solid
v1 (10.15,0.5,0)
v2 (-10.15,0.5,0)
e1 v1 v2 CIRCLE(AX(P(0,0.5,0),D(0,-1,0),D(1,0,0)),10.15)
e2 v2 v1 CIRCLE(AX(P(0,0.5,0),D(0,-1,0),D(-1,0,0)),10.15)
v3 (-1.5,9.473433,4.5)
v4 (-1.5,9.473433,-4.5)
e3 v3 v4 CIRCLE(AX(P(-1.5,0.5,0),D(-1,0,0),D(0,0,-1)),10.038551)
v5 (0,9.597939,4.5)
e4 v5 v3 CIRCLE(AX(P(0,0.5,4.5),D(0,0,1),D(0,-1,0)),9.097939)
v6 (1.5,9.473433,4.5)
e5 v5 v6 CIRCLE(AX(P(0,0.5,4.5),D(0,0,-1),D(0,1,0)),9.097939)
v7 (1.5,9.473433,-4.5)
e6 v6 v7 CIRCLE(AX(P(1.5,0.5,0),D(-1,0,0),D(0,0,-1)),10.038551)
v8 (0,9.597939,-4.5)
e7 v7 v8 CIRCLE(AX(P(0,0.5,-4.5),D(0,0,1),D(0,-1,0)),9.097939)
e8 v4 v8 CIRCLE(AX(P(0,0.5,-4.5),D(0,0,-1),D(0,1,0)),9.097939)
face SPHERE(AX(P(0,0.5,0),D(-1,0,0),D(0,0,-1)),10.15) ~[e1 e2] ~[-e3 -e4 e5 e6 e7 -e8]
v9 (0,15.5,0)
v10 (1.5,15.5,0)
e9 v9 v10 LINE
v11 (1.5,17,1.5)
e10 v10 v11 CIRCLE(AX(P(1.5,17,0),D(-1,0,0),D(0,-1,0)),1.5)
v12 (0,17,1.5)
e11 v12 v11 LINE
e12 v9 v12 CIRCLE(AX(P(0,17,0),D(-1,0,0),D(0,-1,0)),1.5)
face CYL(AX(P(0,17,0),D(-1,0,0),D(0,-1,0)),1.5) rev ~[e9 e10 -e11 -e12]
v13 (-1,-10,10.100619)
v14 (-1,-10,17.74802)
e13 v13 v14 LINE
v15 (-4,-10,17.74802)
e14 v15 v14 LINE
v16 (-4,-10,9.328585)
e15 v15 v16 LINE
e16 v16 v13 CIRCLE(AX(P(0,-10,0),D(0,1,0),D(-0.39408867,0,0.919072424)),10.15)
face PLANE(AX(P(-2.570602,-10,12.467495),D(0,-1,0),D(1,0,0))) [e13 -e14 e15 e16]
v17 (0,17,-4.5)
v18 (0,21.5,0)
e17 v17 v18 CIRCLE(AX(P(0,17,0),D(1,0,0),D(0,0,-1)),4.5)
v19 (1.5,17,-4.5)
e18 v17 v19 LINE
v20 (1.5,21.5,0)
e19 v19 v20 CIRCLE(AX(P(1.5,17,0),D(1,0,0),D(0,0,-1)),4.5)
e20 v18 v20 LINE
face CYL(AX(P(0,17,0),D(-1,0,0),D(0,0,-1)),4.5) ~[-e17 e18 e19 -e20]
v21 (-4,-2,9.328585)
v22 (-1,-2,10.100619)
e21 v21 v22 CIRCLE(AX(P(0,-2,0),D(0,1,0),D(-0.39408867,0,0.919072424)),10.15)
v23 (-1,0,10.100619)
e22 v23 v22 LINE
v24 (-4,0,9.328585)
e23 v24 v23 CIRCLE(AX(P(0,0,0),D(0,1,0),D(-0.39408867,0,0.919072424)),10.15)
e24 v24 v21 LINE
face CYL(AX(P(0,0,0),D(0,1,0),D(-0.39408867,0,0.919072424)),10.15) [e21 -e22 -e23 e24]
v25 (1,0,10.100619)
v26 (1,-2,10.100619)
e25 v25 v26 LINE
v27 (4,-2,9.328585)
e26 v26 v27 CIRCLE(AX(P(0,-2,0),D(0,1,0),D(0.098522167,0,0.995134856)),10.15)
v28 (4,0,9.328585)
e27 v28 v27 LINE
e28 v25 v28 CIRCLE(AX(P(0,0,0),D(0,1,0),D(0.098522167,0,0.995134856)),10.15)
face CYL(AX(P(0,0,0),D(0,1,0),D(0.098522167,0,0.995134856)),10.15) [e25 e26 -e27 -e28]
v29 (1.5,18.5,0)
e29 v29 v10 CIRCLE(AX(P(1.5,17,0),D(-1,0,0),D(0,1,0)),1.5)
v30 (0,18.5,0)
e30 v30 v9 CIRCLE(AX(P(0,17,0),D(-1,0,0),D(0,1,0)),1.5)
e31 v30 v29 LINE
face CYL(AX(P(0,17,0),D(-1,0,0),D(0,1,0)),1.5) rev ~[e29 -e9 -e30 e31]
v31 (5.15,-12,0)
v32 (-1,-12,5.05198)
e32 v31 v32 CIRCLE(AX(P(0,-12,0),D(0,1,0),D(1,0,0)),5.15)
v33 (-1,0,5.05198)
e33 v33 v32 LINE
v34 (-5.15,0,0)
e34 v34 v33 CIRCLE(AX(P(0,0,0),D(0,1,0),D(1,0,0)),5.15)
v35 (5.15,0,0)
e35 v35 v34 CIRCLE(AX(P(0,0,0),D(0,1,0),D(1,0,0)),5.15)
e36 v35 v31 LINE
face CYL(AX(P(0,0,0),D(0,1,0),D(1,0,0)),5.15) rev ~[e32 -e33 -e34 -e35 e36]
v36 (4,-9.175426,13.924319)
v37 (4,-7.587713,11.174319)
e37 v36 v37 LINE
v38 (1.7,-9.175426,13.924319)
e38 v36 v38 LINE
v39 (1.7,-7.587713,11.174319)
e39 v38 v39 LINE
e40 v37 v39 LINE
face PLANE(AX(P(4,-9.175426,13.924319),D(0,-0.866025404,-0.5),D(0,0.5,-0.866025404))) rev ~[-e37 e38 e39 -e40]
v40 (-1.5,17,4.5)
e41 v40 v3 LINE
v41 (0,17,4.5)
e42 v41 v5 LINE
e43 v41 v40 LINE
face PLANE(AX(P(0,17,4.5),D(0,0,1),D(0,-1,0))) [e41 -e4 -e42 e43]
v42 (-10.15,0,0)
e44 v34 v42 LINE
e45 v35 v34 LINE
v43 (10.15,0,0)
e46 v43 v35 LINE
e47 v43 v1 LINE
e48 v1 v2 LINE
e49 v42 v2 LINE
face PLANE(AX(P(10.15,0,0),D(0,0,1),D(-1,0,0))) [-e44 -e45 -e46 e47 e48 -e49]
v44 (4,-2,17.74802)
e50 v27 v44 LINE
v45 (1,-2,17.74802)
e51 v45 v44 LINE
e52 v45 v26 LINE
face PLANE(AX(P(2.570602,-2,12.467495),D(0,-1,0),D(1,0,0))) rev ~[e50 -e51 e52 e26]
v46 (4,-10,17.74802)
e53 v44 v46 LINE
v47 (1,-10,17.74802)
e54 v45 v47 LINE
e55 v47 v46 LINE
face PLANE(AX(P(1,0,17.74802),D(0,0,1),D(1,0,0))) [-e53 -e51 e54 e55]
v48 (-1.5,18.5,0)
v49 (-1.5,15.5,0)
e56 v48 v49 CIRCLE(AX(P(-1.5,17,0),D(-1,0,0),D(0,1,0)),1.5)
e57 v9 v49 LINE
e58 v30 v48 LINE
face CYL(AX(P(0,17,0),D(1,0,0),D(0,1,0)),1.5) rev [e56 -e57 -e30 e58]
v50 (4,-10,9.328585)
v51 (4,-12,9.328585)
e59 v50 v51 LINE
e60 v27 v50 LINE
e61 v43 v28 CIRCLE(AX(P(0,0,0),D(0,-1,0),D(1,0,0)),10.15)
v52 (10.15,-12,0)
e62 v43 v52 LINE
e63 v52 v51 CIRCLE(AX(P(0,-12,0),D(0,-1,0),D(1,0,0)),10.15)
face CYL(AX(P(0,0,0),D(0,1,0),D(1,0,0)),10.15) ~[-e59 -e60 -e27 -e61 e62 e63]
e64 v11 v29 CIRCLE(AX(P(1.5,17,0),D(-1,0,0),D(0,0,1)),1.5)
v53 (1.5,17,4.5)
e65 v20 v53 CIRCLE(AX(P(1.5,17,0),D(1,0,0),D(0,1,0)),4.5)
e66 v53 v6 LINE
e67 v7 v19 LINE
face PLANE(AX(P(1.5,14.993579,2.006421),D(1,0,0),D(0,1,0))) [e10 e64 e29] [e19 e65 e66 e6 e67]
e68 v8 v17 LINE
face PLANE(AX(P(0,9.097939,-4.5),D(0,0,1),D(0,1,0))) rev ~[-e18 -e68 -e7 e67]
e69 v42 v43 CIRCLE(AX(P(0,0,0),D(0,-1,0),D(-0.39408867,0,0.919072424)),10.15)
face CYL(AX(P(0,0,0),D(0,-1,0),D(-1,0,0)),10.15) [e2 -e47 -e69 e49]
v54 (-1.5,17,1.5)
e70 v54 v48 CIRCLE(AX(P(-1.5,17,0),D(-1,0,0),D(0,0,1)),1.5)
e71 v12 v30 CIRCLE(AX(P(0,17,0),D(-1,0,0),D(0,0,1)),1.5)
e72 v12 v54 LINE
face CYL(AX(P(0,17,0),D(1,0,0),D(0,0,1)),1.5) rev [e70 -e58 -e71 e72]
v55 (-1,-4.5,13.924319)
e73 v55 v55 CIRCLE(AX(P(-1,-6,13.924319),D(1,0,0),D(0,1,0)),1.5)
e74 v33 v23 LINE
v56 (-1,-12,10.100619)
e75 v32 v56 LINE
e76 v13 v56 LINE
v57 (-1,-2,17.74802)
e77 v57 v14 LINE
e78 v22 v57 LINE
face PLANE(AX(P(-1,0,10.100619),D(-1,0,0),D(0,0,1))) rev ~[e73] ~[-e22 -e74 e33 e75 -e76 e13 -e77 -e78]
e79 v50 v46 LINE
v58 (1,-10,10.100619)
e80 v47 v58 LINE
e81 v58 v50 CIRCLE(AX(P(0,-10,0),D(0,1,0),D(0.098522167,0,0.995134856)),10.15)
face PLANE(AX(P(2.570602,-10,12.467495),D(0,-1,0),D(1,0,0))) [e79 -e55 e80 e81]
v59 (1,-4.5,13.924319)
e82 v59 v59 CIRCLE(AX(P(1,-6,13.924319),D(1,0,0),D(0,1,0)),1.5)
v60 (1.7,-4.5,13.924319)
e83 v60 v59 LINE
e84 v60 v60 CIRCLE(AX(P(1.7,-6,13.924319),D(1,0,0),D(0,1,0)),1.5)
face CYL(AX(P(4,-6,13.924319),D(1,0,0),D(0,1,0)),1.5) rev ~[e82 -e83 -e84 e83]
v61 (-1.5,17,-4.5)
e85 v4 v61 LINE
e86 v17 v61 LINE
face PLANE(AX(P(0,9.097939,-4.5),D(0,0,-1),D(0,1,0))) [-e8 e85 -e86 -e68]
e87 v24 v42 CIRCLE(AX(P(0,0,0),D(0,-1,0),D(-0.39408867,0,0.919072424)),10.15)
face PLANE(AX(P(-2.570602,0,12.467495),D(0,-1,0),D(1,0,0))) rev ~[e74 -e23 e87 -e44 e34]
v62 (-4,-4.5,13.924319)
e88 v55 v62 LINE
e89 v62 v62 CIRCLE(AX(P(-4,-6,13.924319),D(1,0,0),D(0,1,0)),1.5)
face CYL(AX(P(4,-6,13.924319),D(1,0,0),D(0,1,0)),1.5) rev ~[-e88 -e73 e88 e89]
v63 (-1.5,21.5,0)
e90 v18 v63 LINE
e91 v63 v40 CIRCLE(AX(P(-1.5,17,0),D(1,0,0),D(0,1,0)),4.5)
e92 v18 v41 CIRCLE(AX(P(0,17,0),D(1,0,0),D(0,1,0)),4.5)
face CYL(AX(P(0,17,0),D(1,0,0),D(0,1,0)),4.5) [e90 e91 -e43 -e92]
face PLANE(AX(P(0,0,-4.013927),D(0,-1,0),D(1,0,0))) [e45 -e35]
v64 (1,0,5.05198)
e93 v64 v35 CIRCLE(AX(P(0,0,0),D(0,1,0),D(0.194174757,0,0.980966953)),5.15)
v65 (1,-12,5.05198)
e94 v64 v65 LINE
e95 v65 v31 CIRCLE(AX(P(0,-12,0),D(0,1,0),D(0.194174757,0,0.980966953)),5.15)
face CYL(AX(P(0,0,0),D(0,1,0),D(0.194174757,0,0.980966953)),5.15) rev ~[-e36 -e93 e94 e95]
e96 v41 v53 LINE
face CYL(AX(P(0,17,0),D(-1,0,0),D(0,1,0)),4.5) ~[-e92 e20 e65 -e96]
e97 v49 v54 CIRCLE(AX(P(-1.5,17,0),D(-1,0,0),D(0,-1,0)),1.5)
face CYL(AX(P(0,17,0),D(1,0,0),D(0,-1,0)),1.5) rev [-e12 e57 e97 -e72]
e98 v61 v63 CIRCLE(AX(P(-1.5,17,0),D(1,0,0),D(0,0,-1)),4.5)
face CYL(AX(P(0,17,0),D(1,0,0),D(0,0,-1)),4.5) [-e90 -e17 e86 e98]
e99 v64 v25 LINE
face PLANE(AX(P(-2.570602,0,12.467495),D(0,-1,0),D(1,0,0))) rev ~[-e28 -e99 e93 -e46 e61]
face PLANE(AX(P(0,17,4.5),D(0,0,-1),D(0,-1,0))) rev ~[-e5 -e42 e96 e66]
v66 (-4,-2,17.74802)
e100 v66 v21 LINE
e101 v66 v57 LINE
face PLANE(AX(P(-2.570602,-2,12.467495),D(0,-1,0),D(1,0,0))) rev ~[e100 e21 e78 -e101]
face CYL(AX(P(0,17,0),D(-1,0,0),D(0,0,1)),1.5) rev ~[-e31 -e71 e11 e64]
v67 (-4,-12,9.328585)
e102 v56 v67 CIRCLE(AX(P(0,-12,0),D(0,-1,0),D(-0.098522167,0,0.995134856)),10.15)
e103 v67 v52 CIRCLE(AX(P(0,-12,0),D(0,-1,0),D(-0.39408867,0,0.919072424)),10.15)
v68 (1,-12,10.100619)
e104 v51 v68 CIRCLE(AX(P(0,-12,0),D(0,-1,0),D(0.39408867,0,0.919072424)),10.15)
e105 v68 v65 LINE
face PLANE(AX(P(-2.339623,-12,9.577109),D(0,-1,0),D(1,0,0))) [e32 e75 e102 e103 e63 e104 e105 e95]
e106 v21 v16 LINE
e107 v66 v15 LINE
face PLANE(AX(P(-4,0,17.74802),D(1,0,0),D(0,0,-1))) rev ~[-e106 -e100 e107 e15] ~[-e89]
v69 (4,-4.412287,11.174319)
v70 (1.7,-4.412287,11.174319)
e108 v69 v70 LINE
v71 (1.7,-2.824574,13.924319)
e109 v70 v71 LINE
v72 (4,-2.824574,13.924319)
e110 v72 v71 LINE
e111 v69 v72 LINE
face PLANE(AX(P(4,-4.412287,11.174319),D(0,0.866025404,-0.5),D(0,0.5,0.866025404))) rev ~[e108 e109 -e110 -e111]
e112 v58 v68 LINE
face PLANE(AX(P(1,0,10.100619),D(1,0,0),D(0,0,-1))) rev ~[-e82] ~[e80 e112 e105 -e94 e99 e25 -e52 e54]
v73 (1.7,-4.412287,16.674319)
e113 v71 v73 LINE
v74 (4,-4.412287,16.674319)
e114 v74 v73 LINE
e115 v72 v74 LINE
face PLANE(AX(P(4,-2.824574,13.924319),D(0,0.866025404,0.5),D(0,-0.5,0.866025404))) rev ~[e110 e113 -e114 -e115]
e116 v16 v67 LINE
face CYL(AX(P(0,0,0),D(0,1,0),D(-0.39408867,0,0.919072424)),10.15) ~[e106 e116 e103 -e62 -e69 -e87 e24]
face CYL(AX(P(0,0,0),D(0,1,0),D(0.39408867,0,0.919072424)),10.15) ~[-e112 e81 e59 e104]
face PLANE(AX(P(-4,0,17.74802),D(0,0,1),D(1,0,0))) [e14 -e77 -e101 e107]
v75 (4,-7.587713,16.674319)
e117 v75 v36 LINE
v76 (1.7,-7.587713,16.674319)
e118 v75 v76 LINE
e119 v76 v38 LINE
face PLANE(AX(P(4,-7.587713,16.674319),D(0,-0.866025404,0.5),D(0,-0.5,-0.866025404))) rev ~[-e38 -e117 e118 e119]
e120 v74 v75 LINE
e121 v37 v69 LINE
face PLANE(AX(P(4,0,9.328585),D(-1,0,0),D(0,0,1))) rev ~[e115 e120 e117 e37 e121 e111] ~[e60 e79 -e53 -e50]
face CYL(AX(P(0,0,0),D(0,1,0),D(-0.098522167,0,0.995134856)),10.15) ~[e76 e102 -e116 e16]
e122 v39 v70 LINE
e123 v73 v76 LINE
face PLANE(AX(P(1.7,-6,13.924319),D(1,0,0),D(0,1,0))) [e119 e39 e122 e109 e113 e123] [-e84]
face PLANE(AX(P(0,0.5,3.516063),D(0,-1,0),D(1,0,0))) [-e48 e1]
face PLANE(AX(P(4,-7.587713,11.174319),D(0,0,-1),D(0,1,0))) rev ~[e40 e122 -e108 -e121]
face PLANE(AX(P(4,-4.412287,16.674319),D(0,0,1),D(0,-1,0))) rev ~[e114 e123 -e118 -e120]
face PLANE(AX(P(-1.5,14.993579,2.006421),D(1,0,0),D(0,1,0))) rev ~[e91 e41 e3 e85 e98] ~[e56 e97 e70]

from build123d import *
from build123d import SkipClean  # not in build123d's __all__

# Parameters (mm, degrees)
F1_DEPTH  = 12
F0_W      = 3
F0_H      = 2.5
F2_DEPTH  = 10
F3_DEPTH  = 2
F5_R      = 1.5
F6_DEPTH  = 25
F7_DEPTH  = 2.3
F9_DEPTH  = 0.5
F11_ANGLE = 180
F12_DEPTH = 1.5


with BuildPart() as f1:
    # F0 (on Front) → F1 (new body)
    with BuildSketch(Plane.XZ):
        with BuildLine():
            Line((-4, 9.3285851017), (-1, 9.3285851017))
            Line((-1, 9.3285851017), (-1, 10.1006187929))
            ThreePointArc((-1, 10.1006187929), (-2.529626258, 9.8297248687), (-4, 9.3285851017))
        make_face()
        with BuildLine():
            Line((1, 10.1006187929), (1, 9.3285851017))
            Line((1, 9.3285851017), (4, 9.3285851017))
            ThreePointArc((4, 9.3285851017), (2.529626258, 9.8297248687), (1, 10.1006187929))
        make_face()
        with BuildLine():
            ThreePointArc((1, 5.0519798099), (3.9794786091, 3.2689830223), (5.15, 0))
            ThreePointArc((5.15, 0), (-3.2689830223, -3.9794786091), (-1, 5.0519798099))
            Line((-1, 5.0519798099), (-1, 9.3285851017))
            Line((-1, 9.3285851017), (-4, 9.3285851017))
            ThreePointArc((-4, 9.3285851017), (-5.5867029633, -8.474151875), (10.15, 0))
            ThreePointArc((10.15, 0), (8.474151875, 5.5867029633), (4, 9.3285851017))
            Line((4, 9.3285851017), (1, 9.3285851017))
            Line((1, 9.3285851017), (1, 5.0519798099))
        make_face()
    extrude(amount=F1_DEPTH)

    # F0 (on Front) → F2 (join)
    with BuildSketch(Plane.XZ):
        with BuildLine():
            ThreePointArc((-4, 9.3285851017), (-2.529626258, 9.8297248687), (-1, 10.1006187929))
            Line((-1, 10.1006187929), (-1, 15.2480201901))
            Line((-1, 15.2480201901), (-4, 15.2480201901))
            Line((-4, 15.2480201901), (-4, 9.3285851017))
        make_face()
        with BuildLine():
            Line((1, 15.2480201901), (1, 10.1006187929))
            ThreePointArc((1, 10.1006187929), (2.529626258, 9.8297248687), (4, 9.3285851017))
            Line((4, 9.3285851017), (4, 15.2480201901))
            Line((4, 15.2480201901), (1, 15.2480201901))
        make_face()
        with Locations((-2.5, 16.4980201901)):
            Rectangle(F0_W, F0_H)
        with Locations((2.5, 16.4980201901)):
            Rectangle(F0_W, F0_H)
    extrude(amount=F2_DEPTH)

    # F0 (on Front) → F3 (cut)
    with BuildSketch(Plane.XZ):
        with BuildLine():
            ThreePointArc((-4, 9.3285851017), (-2.529626258, 9.8297248687), (-1, 10.1006187929))
            Line((-1, 10.1006187929), (-1, 15.2480201901))
            Line((-1, 15.2480201901), (-4, 15.2480201901))
            Line((-4, 15.2480201901), (-4, 9.3285851017))
        make_face()
        with BuildLine():
            Line((1, 15.2480201901), (1, 10.1006187929))
            ThreePointArc((1, 10.1006187929), (2.529626258, 9.8297248687), (4, 9.3285851017))
            Line((4, 9.3285851017), (4, 15.2480201901))
            Line((4, 15.2480201901), (1, 15.2480201901))
        make_face()
        with Locations((-2.5, 16.4980201901)):
            Rectangle(F0_W, F0_H)
        with Locations((2.5, 16.4980201901)):
            Rectangle(F0_W, F0_H)
    with SkipClean():  # cleaning this boolean's faces spoils the solid; the shape is the same uncleaned
        extrude(amount=F3_DEPTH, mode=Mode.SUBTRACT)

    # F5 (on face) → F6 (cut)
    with BuildSketch(Plane.YZ.offset(4)):
        with Locations((-6, 13.9243194915)):
            Circle(F5_R)
    extrude(amount=-F6_DEPTH, mode=Mode.SUBTRACT)

    # F5 (on face) → F7 (cut)
    with BuildSketch(Plane.YZ.offset(4)):
        Polygon((-4.4122867597, 16.6743194915), (-7.5877132403, 16.6743194915), (-9.1754264805, 13.9243194915), (-7.5877132403, 11.1743194915), (-4.4122867597, 11.1743194915), (-2.8245735195, 13.9243194915), align=None)
        with Locations((-6, 13.9243194915)):
            Circle(F5_R, mode=Mode.SUBTRACT)
    extrude(amount=-F7_DEPTH, mode=Mode.SUBTRACT)

    # F8 (on face) → F9 (join)
    with BuildSketch(Plane.XZ):
        with BuildLine():
            Line((10.15, 0), (5.15, 0))
            ThreePointArc((5.15, 0), (0, -5.15), (-5.15, 0))
            Line((-5.15, 0), (-10.15, 0))
            ThreePointArc((-10.15, 0), (0, -10.15), (10.15, 0))
        make_face()
        with BuildLine():
            ThreePointArc((-5.15, 0), (0, -5.15), (5.15, 0))
            Line((5.15, 0), (-5.15, 0))
        make_face()
    extrude(amount=-F9_DEPTH)

    # F9_face (on face) → F11 (revolve)
    with BuildSketch(Plane(origin=(0, 0.5, -4.307793793), x_dir=(1, 0, 0), z_dir=(0, 1, 0))):
        with BuildLine():
            Line((-10.15, -4.307793793), (10.15, -4.307793793))
            ThreePointArc((10.15, -4.307793793), (0, 5.842206207), (-10.15, -4.307793793))
        make_face()
    revolve(axis=Axis((0, 0.5, 0), (1, 0, 0)), revolution_arc=F11_ANGLE)

    # F10 (on Right) → F12 (join, symmetric)
    with BuildSketch(Plane.YZ):
        with BuildLine():
            ThreePointArc((17, 4.5), (13.8180194847, 3.1819805153), (12.5, 0))
            Line((12.5, 0), (15.5, 0))
            ThreePointArc((15.5, 0), (15.9393398282, 1.0606601718), (17, 1.5))
            Line((17, 1.5), (17, 4.5))
        make_face()
        with BuildLine():
            ThreePointArc((9.0979393271, 4.5), (9.8834858266, 2.3106726109), (10.15, 0))
            Line((10.15, 0), (12.5, 0))
            ThreePointArc((12.5, 0), (13.8180194847, 3.1819805153), (17, 4.5))
            Line((17, 4.5), (9.0979393271, 4.5))
        make_face()
        with BuildLine():
            Line((12.5, 0), (10.15, 0))
            ThreePointArc((10.15, 0), (9.8834858266, -2.3106726109), (9.0979393271, -4.5))
            Line((9.0979393271, -4.5), (17, -4.5))
            ThreePointArc((17, -4.5), (13.8180194847, -3.1819805153), (12.5, 0))
        make_face()
        with BuildLine():
            Line((15.5, 0), (12.5, 0))
            ThreePointArc((12.5, 0), (13.8180194847, -3.1819805153), (17, -4.5))
            ThreePointArc((17, -4.5), (20.1819805153, -3.1819805153), (21.5, 0))
            ThreePointArc((21.5, 0), (20.1819805153, 3.1819805153), (17, 4.5))
            Line((17, 4.5), (17, 1.5))
            ThreePointArc((17, 1.5), (18.0606601718, 1.0606601718), (18.5, 0))
            ThreePointArc((18.5, 0), (17, -1.5), (15.5, 0))
        make_face()
    extrude(amount=F12_DEPTH, both=True)


solid = f1.part
